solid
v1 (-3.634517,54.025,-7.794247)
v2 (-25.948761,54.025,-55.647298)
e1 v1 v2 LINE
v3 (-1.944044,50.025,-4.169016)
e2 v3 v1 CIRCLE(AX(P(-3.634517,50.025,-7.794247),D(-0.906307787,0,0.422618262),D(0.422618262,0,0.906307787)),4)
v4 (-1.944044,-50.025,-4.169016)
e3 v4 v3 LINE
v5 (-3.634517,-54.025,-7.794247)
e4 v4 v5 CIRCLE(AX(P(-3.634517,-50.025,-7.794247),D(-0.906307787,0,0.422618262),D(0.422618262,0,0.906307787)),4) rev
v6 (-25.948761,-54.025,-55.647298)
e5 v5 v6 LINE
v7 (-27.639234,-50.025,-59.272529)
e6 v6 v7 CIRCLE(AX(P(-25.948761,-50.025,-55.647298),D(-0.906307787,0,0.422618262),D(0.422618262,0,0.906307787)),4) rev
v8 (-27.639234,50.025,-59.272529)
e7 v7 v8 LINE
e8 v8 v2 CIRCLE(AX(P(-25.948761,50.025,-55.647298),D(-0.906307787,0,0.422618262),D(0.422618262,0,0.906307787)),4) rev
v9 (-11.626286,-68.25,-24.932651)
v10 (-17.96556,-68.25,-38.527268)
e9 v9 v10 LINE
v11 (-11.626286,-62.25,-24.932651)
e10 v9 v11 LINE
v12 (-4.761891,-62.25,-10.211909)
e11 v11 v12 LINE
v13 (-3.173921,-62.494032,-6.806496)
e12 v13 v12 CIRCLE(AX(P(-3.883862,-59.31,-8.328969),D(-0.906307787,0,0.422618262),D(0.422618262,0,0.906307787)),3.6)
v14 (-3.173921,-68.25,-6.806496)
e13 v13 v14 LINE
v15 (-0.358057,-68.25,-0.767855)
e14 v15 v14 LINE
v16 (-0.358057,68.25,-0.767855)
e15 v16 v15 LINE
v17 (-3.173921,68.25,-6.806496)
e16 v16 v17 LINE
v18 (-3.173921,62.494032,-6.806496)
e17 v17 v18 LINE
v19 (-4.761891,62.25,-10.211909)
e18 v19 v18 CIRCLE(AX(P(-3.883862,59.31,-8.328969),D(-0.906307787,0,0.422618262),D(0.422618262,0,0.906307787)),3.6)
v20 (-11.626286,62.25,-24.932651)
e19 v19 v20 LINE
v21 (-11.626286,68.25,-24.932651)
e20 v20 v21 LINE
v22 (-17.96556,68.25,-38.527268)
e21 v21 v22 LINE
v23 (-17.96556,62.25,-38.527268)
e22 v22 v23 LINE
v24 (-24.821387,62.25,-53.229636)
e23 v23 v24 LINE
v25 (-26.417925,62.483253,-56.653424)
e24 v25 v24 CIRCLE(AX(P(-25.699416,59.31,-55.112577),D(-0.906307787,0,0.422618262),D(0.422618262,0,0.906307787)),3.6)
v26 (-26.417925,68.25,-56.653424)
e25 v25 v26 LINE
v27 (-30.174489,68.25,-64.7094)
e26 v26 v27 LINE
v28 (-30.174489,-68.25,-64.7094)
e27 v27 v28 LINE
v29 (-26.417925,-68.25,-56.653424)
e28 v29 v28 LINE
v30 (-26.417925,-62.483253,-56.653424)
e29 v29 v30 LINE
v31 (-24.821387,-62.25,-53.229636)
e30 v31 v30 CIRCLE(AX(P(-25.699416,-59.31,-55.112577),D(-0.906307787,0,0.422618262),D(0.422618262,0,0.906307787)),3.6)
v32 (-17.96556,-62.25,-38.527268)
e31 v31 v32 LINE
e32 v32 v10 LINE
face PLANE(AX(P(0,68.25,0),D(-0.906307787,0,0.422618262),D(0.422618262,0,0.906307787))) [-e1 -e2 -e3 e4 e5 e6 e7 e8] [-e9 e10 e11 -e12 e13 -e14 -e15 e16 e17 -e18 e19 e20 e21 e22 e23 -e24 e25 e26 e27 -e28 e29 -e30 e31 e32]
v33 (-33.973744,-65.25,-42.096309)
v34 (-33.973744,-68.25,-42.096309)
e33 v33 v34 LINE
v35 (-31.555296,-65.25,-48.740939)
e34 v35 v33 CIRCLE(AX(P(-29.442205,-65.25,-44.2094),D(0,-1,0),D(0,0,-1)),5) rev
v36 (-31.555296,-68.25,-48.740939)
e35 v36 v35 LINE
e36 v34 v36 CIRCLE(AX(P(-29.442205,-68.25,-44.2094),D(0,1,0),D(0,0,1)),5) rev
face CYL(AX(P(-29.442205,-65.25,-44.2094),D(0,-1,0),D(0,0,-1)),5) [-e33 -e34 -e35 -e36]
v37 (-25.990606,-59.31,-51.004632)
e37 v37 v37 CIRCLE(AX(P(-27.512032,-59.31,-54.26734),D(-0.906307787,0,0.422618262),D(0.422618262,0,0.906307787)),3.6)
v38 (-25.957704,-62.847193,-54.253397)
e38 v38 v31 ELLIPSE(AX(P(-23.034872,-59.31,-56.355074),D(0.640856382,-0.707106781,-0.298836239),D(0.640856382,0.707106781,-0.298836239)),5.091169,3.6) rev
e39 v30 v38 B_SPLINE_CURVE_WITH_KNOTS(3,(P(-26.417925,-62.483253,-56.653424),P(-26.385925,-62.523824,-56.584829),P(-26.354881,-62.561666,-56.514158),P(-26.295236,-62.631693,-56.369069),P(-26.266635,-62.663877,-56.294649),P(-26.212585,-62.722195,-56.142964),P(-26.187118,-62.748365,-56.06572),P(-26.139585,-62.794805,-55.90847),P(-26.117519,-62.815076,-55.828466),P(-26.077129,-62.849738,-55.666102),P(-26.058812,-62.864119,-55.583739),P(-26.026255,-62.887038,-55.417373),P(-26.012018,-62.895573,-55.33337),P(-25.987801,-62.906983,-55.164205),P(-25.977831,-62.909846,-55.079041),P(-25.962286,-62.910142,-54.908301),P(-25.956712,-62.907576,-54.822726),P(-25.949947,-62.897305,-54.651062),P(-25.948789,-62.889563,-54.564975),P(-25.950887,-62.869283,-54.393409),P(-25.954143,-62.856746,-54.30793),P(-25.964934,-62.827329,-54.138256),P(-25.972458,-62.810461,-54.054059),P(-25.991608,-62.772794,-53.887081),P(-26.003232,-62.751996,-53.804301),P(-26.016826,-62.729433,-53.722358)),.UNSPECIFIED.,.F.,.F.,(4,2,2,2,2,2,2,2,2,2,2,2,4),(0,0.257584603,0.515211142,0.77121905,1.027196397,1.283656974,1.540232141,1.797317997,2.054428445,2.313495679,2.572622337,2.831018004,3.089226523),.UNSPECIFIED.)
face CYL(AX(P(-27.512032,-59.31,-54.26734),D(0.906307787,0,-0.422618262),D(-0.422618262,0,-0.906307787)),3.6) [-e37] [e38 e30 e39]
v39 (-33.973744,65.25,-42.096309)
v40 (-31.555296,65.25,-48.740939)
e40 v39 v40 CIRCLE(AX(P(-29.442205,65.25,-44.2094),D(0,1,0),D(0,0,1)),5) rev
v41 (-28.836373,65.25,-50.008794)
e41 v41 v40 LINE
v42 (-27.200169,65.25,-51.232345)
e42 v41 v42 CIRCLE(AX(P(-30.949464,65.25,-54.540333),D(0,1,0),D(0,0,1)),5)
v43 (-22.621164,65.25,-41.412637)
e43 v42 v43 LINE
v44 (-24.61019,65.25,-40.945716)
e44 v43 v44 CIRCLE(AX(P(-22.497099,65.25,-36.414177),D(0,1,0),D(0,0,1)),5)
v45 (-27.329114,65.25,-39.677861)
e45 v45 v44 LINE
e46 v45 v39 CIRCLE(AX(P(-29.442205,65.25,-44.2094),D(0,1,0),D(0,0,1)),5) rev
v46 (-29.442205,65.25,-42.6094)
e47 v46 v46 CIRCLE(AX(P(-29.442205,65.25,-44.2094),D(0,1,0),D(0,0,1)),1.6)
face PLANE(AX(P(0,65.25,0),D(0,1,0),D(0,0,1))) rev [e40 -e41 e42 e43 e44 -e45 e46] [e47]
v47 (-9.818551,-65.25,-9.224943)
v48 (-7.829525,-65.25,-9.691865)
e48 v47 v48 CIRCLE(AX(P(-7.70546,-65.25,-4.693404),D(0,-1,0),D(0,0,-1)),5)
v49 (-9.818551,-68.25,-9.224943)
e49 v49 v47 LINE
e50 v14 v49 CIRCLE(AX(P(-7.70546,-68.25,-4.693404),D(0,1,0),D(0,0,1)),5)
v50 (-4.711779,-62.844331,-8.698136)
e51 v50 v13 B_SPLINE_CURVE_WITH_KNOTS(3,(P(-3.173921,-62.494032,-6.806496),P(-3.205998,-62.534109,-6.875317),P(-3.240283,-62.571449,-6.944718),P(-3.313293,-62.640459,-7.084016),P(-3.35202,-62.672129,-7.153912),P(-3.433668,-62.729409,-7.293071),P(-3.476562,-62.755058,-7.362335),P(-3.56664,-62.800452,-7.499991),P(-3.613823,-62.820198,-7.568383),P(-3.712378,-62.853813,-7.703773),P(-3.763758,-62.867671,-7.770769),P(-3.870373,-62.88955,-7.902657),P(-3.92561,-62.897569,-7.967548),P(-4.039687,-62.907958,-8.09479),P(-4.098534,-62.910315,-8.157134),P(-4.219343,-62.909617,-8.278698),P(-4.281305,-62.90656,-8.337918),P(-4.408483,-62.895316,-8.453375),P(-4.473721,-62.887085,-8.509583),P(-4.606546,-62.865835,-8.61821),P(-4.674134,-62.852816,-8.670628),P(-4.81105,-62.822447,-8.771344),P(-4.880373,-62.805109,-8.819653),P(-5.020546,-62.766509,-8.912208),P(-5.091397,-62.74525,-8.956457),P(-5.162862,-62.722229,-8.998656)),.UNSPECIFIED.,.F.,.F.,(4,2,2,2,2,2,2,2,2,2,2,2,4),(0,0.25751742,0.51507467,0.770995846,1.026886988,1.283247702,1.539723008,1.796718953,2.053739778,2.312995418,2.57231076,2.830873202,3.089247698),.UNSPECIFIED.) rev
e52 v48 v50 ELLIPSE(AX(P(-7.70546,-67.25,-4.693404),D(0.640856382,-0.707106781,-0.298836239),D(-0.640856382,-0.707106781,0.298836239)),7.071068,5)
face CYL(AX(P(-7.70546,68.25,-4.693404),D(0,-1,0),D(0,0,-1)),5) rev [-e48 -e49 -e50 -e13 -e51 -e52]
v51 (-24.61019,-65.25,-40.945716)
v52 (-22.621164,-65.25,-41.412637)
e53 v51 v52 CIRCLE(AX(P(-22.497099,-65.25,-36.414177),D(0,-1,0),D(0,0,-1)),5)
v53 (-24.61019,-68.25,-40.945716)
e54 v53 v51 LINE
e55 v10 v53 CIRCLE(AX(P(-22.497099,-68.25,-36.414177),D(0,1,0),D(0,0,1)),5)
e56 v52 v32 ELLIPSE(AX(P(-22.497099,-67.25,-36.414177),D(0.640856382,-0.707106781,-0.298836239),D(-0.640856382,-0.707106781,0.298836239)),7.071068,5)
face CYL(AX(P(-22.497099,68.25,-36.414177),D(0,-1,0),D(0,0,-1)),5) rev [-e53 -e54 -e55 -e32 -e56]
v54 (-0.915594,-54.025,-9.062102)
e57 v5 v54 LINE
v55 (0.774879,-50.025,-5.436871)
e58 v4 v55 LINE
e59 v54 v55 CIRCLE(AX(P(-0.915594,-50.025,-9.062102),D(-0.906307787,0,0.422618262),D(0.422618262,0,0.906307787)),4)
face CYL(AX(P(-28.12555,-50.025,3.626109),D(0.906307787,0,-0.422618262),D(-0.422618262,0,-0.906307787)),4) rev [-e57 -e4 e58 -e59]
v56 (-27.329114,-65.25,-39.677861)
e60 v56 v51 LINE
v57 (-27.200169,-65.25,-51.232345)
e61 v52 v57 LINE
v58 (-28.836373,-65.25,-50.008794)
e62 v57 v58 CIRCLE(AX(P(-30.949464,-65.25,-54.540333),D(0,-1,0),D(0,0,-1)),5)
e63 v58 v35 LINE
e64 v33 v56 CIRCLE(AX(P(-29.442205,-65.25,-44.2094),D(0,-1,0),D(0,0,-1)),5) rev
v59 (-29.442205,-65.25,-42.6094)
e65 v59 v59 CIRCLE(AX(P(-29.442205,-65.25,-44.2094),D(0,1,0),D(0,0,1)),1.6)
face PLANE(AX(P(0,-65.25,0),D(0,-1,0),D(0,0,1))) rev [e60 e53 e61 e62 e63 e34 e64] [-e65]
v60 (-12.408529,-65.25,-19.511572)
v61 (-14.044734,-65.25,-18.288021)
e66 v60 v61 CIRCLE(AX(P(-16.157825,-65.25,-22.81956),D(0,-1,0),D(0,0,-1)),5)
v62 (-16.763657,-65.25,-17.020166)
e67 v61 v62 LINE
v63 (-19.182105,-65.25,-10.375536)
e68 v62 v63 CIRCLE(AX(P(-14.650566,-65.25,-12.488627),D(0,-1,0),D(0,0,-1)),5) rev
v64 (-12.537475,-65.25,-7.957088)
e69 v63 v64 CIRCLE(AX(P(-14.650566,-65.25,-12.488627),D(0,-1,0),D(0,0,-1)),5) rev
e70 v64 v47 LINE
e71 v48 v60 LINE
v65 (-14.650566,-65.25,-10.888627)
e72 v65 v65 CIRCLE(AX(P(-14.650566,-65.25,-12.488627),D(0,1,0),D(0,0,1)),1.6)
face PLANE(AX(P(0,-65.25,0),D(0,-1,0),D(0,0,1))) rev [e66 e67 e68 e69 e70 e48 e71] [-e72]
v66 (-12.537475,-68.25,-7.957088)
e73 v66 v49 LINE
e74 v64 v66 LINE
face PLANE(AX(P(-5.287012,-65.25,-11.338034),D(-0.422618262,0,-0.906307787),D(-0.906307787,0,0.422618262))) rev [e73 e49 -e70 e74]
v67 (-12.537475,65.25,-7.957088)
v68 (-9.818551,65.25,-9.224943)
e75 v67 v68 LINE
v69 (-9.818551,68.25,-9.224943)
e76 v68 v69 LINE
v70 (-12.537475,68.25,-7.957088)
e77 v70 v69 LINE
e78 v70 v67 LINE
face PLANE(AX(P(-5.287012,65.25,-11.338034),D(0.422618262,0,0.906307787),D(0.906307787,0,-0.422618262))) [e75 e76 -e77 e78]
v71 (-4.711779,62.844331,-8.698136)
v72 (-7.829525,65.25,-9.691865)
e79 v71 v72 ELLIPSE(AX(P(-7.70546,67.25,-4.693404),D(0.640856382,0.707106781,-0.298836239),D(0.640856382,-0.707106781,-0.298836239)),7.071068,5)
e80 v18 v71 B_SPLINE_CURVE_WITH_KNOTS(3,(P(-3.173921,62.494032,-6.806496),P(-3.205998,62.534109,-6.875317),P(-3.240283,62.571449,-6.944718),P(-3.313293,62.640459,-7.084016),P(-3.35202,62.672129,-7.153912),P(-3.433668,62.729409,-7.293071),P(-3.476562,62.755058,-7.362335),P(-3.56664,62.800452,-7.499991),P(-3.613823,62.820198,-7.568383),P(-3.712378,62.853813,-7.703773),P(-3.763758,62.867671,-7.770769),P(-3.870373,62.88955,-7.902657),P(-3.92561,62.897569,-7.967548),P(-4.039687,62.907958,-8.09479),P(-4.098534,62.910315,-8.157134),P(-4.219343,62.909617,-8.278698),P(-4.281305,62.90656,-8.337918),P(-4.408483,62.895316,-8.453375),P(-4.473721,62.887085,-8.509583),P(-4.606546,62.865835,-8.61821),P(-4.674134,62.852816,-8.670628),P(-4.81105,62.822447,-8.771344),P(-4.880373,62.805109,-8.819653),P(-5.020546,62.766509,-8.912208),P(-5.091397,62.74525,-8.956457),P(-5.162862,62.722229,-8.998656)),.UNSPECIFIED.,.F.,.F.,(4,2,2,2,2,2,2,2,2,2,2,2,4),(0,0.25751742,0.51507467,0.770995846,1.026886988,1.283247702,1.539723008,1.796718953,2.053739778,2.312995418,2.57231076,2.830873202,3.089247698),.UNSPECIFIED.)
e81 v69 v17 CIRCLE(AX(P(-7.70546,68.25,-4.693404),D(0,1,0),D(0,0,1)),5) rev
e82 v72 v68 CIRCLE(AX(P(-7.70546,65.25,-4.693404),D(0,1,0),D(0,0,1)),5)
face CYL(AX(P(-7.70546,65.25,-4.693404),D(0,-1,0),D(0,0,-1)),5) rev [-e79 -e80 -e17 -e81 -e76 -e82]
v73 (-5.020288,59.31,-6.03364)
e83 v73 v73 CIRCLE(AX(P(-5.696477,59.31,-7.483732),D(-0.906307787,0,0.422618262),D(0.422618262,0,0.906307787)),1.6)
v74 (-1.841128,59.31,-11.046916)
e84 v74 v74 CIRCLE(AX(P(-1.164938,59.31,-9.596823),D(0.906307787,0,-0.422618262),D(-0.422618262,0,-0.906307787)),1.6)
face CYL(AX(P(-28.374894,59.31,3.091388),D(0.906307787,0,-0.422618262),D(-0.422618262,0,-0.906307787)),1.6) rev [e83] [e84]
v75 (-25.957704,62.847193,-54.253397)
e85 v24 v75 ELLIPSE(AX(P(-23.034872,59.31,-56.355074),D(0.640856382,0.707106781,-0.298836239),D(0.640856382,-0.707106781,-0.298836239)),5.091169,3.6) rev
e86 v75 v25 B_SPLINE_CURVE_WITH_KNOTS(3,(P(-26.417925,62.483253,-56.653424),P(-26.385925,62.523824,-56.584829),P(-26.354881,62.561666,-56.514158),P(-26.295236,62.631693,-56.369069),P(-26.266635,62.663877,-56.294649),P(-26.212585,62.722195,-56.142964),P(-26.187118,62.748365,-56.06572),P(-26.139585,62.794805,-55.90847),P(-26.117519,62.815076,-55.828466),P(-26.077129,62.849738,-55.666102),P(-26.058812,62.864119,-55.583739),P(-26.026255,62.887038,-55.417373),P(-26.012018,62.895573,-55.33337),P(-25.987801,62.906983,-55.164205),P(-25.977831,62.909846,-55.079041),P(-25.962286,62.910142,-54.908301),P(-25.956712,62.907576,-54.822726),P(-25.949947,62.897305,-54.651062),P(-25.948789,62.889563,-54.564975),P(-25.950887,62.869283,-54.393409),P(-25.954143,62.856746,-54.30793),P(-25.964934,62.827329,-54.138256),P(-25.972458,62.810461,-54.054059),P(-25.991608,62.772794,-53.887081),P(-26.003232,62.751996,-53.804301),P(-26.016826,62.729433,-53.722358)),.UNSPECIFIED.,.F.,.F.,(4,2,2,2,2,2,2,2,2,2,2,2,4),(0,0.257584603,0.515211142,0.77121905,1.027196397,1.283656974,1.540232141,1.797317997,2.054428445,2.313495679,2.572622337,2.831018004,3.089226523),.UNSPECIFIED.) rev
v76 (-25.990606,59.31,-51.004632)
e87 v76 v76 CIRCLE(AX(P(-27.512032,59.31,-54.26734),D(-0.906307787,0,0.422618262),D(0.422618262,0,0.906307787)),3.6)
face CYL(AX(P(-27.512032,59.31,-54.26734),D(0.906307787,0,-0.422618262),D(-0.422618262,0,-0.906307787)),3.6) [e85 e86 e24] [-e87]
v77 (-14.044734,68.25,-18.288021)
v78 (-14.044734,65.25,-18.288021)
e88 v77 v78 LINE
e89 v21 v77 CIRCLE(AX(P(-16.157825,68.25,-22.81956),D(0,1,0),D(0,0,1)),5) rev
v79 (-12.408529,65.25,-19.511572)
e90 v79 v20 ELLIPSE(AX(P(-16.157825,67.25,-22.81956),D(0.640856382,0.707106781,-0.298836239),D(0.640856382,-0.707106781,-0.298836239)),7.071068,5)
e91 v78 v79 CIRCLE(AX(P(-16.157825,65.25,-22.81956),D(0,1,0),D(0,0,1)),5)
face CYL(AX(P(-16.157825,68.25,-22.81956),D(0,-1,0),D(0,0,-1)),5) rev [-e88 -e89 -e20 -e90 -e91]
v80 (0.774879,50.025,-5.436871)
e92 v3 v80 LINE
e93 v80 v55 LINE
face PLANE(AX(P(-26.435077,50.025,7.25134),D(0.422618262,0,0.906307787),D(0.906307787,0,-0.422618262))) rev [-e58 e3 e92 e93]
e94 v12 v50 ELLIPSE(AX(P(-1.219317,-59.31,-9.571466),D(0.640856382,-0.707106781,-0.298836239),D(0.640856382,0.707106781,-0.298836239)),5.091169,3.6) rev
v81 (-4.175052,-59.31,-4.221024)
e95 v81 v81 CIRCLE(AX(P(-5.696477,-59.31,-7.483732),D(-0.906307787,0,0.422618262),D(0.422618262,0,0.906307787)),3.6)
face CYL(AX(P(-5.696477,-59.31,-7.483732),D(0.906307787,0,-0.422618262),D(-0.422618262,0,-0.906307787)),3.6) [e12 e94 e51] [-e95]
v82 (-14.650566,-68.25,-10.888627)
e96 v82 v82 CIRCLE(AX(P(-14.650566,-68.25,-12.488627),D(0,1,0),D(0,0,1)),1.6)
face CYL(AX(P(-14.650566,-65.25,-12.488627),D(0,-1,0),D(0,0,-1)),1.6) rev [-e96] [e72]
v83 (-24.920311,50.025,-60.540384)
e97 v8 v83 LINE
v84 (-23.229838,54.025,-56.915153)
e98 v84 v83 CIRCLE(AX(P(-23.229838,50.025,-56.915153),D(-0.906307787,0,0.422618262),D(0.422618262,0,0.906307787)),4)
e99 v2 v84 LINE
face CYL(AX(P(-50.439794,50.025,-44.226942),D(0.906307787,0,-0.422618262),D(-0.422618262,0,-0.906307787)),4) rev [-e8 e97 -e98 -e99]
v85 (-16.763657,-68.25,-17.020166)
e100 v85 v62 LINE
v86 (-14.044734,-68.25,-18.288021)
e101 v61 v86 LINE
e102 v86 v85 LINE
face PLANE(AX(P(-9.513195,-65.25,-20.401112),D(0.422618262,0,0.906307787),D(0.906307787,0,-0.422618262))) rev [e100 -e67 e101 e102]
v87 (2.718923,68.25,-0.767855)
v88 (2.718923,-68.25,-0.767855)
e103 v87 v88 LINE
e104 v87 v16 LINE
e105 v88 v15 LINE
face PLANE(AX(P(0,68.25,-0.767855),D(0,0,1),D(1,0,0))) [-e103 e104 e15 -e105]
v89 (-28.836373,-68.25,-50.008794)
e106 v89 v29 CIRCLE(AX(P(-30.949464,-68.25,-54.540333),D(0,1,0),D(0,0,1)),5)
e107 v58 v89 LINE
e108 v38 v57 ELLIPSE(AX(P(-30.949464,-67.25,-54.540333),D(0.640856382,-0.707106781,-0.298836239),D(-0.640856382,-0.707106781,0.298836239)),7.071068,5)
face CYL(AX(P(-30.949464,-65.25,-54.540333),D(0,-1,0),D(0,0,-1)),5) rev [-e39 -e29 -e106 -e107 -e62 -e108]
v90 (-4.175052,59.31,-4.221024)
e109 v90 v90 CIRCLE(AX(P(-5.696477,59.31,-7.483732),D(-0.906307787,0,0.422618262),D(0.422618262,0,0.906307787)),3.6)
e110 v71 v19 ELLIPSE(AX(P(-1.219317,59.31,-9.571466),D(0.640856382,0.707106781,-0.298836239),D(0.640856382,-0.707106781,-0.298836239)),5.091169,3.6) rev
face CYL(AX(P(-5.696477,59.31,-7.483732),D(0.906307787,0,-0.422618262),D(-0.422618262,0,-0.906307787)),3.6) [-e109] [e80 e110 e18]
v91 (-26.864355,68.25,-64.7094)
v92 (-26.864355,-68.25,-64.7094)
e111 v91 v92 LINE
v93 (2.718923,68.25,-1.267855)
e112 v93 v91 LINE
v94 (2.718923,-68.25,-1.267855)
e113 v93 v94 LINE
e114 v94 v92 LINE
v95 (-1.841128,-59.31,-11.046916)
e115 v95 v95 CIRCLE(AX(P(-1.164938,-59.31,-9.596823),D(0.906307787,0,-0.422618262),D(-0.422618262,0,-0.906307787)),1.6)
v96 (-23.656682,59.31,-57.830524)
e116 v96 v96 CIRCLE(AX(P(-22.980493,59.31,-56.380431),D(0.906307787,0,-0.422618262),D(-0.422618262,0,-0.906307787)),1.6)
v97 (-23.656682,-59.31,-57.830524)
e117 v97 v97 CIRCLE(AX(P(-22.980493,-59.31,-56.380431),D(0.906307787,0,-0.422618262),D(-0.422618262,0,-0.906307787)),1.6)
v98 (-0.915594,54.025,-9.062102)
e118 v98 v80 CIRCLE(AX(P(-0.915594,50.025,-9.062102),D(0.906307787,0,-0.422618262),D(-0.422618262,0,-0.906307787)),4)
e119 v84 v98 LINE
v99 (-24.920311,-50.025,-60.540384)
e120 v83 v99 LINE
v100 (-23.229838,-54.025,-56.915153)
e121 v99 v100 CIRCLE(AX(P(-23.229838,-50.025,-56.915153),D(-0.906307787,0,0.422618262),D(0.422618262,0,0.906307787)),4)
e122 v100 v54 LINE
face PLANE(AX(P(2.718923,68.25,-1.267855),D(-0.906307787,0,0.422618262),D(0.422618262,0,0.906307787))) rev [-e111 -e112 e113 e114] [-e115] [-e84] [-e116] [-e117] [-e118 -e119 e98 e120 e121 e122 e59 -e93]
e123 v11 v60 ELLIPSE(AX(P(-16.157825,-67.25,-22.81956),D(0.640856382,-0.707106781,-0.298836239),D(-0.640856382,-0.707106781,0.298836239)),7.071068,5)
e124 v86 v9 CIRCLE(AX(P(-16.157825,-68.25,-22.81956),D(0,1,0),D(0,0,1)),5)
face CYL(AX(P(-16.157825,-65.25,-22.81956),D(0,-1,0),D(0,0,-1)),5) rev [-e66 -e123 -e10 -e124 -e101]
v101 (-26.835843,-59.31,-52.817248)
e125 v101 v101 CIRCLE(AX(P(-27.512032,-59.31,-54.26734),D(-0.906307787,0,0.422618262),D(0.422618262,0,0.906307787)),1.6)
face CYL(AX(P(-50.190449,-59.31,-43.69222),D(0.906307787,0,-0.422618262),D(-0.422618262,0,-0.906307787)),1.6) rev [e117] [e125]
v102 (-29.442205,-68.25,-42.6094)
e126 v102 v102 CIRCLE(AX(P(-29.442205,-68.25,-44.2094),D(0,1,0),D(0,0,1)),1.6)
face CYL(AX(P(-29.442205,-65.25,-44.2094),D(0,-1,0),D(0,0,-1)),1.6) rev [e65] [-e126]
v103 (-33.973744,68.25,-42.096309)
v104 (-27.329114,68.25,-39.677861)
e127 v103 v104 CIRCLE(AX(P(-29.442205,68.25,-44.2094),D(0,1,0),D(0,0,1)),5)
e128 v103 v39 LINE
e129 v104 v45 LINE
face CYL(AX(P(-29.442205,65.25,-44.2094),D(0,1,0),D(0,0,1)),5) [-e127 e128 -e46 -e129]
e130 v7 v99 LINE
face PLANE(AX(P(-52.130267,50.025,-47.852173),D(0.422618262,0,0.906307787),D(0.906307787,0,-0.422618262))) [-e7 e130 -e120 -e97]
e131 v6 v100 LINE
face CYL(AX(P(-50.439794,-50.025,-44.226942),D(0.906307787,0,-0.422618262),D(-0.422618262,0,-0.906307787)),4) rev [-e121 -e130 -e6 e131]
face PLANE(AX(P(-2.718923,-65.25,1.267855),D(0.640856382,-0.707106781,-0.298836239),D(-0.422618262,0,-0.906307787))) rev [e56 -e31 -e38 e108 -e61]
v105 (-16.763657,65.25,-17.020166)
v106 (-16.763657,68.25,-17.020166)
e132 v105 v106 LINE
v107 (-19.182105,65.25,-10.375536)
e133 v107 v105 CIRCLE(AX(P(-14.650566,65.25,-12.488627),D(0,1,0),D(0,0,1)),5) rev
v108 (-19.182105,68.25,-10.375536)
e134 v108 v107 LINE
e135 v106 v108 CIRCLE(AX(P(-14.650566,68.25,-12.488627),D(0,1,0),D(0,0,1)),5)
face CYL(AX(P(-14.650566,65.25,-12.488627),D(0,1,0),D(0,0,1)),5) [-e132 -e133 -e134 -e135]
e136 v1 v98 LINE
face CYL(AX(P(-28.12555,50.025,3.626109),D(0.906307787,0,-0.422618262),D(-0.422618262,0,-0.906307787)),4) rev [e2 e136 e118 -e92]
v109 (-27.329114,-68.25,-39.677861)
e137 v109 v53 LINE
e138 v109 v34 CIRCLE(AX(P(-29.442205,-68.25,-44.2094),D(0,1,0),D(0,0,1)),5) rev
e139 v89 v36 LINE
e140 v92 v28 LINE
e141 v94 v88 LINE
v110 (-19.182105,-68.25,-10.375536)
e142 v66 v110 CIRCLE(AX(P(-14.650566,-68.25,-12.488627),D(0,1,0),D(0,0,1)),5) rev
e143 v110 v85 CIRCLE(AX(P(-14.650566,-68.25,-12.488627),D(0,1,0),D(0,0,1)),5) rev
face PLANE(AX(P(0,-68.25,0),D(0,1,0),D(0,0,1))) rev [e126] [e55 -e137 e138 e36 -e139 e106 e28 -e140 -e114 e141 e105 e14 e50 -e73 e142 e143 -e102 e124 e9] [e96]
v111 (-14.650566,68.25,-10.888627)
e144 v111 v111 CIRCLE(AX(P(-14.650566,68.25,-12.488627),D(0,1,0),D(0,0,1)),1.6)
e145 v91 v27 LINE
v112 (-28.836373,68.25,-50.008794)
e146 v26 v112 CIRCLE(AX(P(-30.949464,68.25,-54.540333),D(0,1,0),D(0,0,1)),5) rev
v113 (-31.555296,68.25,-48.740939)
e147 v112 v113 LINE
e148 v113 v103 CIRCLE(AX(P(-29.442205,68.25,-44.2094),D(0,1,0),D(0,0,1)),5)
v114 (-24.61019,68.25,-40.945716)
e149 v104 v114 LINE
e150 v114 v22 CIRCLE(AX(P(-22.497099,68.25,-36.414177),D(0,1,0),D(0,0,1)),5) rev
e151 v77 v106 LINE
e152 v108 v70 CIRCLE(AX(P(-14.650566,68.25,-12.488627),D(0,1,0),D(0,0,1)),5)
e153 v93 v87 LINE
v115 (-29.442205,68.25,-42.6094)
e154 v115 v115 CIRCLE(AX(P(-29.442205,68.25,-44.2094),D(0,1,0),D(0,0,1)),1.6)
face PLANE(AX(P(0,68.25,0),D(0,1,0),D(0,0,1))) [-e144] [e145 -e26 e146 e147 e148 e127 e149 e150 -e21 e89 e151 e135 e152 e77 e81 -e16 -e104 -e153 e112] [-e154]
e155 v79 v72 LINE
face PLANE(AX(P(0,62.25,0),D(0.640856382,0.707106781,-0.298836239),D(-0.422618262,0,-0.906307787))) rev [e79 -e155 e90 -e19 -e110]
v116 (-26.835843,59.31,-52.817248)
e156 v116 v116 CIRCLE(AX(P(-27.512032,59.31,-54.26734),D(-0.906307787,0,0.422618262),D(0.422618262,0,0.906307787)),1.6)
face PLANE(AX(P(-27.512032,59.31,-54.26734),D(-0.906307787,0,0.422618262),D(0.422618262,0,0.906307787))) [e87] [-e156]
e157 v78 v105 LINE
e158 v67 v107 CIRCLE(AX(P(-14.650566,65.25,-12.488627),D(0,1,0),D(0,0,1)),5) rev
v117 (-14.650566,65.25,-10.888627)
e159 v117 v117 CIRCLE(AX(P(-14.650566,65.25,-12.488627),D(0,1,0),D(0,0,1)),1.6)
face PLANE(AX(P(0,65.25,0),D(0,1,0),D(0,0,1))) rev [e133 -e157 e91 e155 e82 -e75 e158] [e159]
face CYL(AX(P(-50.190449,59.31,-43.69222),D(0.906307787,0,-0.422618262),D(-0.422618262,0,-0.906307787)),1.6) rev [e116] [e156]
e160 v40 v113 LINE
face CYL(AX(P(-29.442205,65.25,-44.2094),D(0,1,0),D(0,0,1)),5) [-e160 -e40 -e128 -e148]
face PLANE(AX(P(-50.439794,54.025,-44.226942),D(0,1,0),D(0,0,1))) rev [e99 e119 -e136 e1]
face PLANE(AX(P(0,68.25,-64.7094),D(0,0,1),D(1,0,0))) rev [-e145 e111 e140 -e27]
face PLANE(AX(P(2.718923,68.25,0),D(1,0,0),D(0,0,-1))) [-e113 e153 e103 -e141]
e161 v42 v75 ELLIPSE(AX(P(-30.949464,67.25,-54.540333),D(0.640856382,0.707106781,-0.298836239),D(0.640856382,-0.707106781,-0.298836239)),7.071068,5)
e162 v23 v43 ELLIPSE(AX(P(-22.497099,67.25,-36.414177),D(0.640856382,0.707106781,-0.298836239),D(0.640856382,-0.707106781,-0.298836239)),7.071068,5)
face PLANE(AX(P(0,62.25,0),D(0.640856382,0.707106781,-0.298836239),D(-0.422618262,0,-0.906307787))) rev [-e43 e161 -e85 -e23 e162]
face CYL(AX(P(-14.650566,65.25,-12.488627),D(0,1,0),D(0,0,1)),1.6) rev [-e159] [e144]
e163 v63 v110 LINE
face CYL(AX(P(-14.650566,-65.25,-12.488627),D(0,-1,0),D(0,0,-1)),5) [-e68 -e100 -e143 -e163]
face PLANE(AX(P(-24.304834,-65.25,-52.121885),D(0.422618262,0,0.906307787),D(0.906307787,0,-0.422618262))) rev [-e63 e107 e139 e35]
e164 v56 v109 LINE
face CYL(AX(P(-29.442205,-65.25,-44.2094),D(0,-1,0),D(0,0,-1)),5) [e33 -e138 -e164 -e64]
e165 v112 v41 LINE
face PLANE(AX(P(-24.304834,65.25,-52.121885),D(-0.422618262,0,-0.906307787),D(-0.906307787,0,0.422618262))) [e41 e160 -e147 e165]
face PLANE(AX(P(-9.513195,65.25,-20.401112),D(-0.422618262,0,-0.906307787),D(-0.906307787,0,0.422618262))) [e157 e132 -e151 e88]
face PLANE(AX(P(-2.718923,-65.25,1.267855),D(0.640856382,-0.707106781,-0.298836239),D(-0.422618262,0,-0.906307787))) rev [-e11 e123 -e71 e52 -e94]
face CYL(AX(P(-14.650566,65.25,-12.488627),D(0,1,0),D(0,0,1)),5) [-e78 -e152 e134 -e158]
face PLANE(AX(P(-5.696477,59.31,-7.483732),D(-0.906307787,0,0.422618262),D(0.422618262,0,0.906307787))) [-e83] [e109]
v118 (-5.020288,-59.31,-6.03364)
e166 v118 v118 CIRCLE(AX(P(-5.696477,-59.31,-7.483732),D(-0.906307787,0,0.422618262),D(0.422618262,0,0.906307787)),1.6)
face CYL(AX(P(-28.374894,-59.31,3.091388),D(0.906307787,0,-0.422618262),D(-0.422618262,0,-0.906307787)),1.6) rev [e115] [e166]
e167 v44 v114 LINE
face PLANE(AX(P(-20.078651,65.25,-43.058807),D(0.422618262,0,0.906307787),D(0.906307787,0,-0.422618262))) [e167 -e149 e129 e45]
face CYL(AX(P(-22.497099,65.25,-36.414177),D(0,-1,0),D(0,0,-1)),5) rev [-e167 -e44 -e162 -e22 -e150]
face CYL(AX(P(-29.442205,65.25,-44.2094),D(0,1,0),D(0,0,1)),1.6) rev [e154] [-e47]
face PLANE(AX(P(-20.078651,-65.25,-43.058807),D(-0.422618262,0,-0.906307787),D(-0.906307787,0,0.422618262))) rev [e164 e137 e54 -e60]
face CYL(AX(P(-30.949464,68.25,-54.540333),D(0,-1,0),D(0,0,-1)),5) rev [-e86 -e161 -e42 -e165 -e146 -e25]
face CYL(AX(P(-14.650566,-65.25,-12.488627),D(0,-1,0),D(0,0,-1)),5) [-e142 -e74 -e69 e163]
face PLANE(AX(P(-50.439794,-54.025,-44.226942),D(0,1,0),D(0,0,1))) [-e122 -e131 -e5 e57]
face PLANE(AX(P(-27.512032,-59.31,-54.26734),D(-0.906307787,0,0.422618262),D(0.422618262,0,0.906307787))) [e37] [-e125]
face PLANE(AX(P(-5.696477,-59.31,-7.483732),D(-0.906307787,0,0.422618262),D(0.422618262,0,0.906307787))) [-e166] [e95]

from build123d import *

# Parameters (mm, degrees)
BOSS_EXTRU_1_DEPTH      = 68.25
ESQUISSE2_R             = 1.6
ENL_V_MAT_EXTRU_2_DEPTH = 99.817350207
ESQUISSE9_R             = 3.6
ESQUISSE9_R_2           = 1.6
BOSS_EXTRU_2_DEPTH      = 2
ESQUISSE12_R            = 1.6
BOSS_EXTRU_4_DEPTH      = 3
CHANFREIN1_SIZE         = 3
CONG_1_R                = 5


with BuildPart() as part:
    # Esquisse1 → Boss.-Extru.1 (new, symmetric)
    with BuildSketch(Plane(origin=(0, 0, 0), x_dir=(1, 0, 0), z_dir=(0, 1, 0))):
        Polygon((-0.358056567, 0.767854785), (2.718923361, 0.767854785), (2.718923361, 1.267854785), (-26.864354961, 64.709399878), (-30.174488718, 64.709399878), align=None)
    extrude(amount=BOSS_EXTRU_1_DEPTH, both=True)

    # Esquisse2 → Enlèv. mat.-Extru.2 (cut, through all)
    with BuildSketch(Plane(origin=(2.718923361, 0, -1.267854785), x_dir=(-0.42261826174069733, 0, -0.906307787036651), z_dir=(0.9063077870366509, 0, -0.4226182617406973))):
        with Locations((60.81, 59.31)):
            Circle(ESQUISSE2_R)
        with Locations((9.19, 59.31)):
            Circle(ESQUISSE2_R)
        with Locations((60.81, -59.31)):
            Circle(ESQUISSE2_R)
        with Locations((9.19, -59.31)):
            Circle(ESQUISSE2_R)
        with BuildLine():
            Line((61.4, 54.025), (8.6, 54.025))
            ThreePointArc((8.6, 54.025), (5.771572875, 52.853427125), (4.6, 50.025))
            Line((4.6, 50.025), (4.6, -50.025))
            ThreePointArc((4.6, -50.025), (5.771572875, -52.853427125), (8.6, -54.025))
            Line((8.6, -54.025), (61.4, -54.025))
            ThreePointArc((61.4, -54.025), (64.228427125, -52.853427125), (65.4, -50.025))
            Line((65.4, -50.025), (65.4, 50.025))
            ThreePointArc((65.4, 50.025), (64.228427125, 52.853427125), (61.4, 54.025))
        make_face()
    extrude(amount=-ENL_V_MAT_EXTRU_2_DEPTH, mode=Mode.SUBTRACT)

    # Esquisse9 → Boss.-Extru.2 (add)
    # profile 1 of 4: a face of its own
    with BuildSketch(Plane(origin=(0, 0, 0), x_dir=(0.42261826174069717, 0, 0.906307787036651), z_dir=(-0.906307787036651, 0, 0.42261826174069717))):
        with Locations((-60.81, -59.31)):
            Circle(ESQUISSE9_R)
        with Locations(Location((-60.81, -59.31, 0), (0, 0, 180))):
            Circle(ESQUISSE9_R_2, mode=Mode.SUBTRACT)
    # profile 2 of 4: a face of its own
    with BuildSketch(Plane(origin=(0, 0, 0), x_dir=(0.42261826174069717, 0, 0.906307787036651), z_dir=(-0.906307787036651, 0, 0.42261826174069717))):
        with Locations((-9.19, -59.31)):
            Circle(ESQUISSE9_R)
        with Locations(Location((-9.19, -59.31, 0), (0, 0, 180))):
            Circle(ESQUISSE9_R_2, mode=Mode.SUBTRACT)
    # profile 3 of 4: a face of its own
    with BuildSketch(Plane(origin=(0, 0, 0), x_dir=(0.42261826174069717, 0, 0.906307787036651), z_dir=(-0.906307787036651, 0, 0.42261826174069717))):
        with Locations((-60.81, 59.31)):
            Circle(ESQUISSE9_R)
        with Locations(Location((-60.81, 59.31, 0), (0, 0, 180))):
            Circle(ESQUISSE9_R_2, mode=Mode.SUBTRACT)
    # profile 4 of 4: a face of its own
    with BuildSketch(Plane(origin=(0, 0, 0), x_dir=(0.42261826174069717, 0, 0.906307787036651), z_dir=(-0.906307787036651, 0, 0.42261826174069717))):
        with Locations((-9.19, 59.31)):
            Circle(ESQUISSE9_R)
        with Locations(Location((-9.19, 59.31, 0), (0, 0, 180))):
            Circle(ESQUISSE9_R_2, mode=Mode.SUBTRACT)
    extrude(amount=BOSS_EXTRU_2_DEPTH)

    # Esquisse12 → Boss.-Extru.4 (add)
    # profile 1 of 2: a face of its own
    with BuildSketch(Plane(origin=(0, 68.25, 0), x_dir=(1, 0, 0), z_dir=(0, 1, 0))):
        Polygon((-24.30483409, 52.121884907), (-20.078651472, 43.058807037), (-31.860652704, 37.564769634), (-36.086835321, 46.627847504), align=None)
        with Locations(Location((-29.442205077, 44.209399878, 0), (0, 0, 270))):
            Circle(ESQUISSE12_R, mode=Mode.SUBTRACT)
    # profile 2 of 2: a face of its own
    with BuildSketch(Plane(origin=(0, 68.25, 0), x_dir=(1, 0, 0), z_dir=(0, 1, 0))):
        Polygon((-9.513194929, 20.401112361), (-5.287012311, 11.33803449), (-17.069013543, 5.843997088), (-21.29519616, 14.907074958), align=None)
        with Locations(Location((-14.650565916, 12.488627332, 0), (0, 0, 270))):
            Circle(ESQUISSE12_R, mode=Mode.SUBTRACT)
    boss_extru_4 = extrude(amount=-BOSS_EXTRU_4_DEPTH)

    # Symétrie1: Boss.-Extru.4 across plane
    add(boss_extru_4.mirror(Plane.ZX))

    # Chanfrein1
    chanfrein1_edges = [part.edges().sort_by_distance(p)[0] for p in [
        (-22.191742781, 65.25, -47.590345972),
        (-7.40010362, 65.25, -15.869573425),
        (-22.191742781, -65.25, -47.590345972),
        (-7.40010362, -65.25, -15.869573425),
    ]]
    chamfer(chanfrein1_edges, length=CHANFREIN1_SIZE)

    # Congé1
    # the kernel refuses this fillet: 5 mm, written as the material it adds along each edge
    with BuildSketch(Plane(origin=(-5.287012311, -49.75, -11.33803449), x_dir=(0.422618261740698, 0, 0.9063077870366506), z_dir=(0, -1, 0))) as cong_1_piece_1_section:
        with BuildLine():
            CenterArc((CONG_1_R, CONG_1_R), CONG_1_R, 180, 90)
            Line((0, CONG_1_R), (0, 0))
            Line((0, 0), (CONG_1_R, 0))
        make_face()
    cong_1_piece_1 = extrude(amount=18.5, mode=Mode.PRIVATE)
    cong_1_piece_1 = split(cong_1_piece_1, bisect_by=Plane(origin=(-5.847164169, -63.503441979, -9.573387631), z_dir=(0.6408563820557893, -0.7071067811865476, -0.2988362387301183)), keep=Keep.TOP, mode=Mode.PRIVATE)
    add(cong_1_piece_1)
    with BuildSketch(Plane(origin=(-5.287012311, -49.75, -11.33803449), x_dir=(0.422618261740698, 0, 0.9063077870366506), z_dir=(0, -1, 0))) as cong_1_piece_2_section:
        with BuildLine():
            CenterArc((CONG_1_R, CONG_1_R), CONG_1_R, 180, 90)
            Line((0, CONG_1_R), (0, 0))
            Line((0, 0), (CONG_1_R, 0))
        make_face()
    cong_1_piece_2 = extrude(amount=18.5, mode=Mode.PRIVATE)
    cong_1_piece_2 = split(cong_1_piece_2, bisect_by=Plane(origin=(-8.692712143, -65.25, -9.659141323), z_dir=(0, -1, 0)), keep=Keep.TOP, mode=Mode.PRIVATE)
    add(cong_1_piece_2)
    with BuildSketch(Plane(origin=(-9.513194929, -68.25, -20.401112361), x_dir=(-0.42261826174069805, 0, -0.9063077870366507), z_dir=(0, 1, 0))) as cong_1_piece_3_section:
        with BuildLine():
            CenterArc((CONG_1_R, CONG_1_R), CONG_1_R, 180, 90)
            Line((0, CONG_1_R), (0, 0))
            Line((0, 0), (CONG_1_R, 0))
        make_face()
    cong_1_piece_3 = extrude(amount=18.5, mode=Mode.PRIVATE)
    cong_1_piece_3 = split(cong_1_piece_3, bisect_by=Plane(origin=(-12.528126804, -65.051720555, -20.237219019), z_dir=(0.6408563820557893, -0.7071067811865476, -0.2988362387301183)), keep=Keep.TOP, mode=Mode.PRIVATE)
    add(cong_1_piece_3)
    with BuildSketch(Plane(origin=(-9.513194929, -68.25, -20.401112361), x_dir=(-0.42261826174069805, 0, -0.9063077870366507), z_dir=(0, 1, 0))) as cong_1_piece_4_section:
        with BuildLine():
            CenterArc((CONG_1_R, CONG_1_R), CONG_1_R, 180, 90)
            Line((0, CONG_1_R), (0, 0))
            Line((0, 0), (CONG_1_R, 0))
        make_face()
    cong_1_piece_4 = extrude(amount=18.5, mode=Mode.PRIVATE)
    cong_1_piece_4 = split(cong_1_piece_4, bisect_by=Plane(origin=(-12.988443364, -65.25, -18.871366656), z_dir=(0, -1, 0)), keep=Keep.TOP, mode=Mode.PRIVATE)
    add(cong_1_piece_4)
    with BuildSketch(Plane(origin=(-20.078651472, -49.75, -43.058807037), x_dir=(0.4226182617406975, 1.3235243039690182e-15, 0.9063077870366509), z_dir=(0, -1, 0))) as cong_1_piece_5_section:
        with BuildLine():
            CenterArc((CONG_1_R, CONG_1_R), CONG_1_R, 180, 90)
            Line((0, CONG_1_R), (0, 0))
            Line((0, 0), (CONG_1_R, 0))
        make_face()
    cong_1_piece_5 = extrude(amount=18.5, mode=Mode.PRIVATE)
    cong_1_piece_5 = split(cong_1_piece_5, bisect_by=Plane(origin=(-23.484351304, -65.25, -41.379913869), z_dir=(0, -1, 0)), keep=Keep.TOP, mode=Mode.PRIVATE)
    add(cong_1_piece_5)
    with BuildSketch(Plane(origin=(-20.078651472, -49.75, -43.058807037), x_dir=(0.4226182617406975, 1.3235243039690182e-15, 0.9063077870366509), z_dir=(0, -1, 0))) as cong_1_piece_6_section:
        with BuildLine():
            CenterArc((CONG_1_R, CONG_1_R), CONG_1_R, 180, 90)
            Line((0, CONG_1_R), (0, 0))
            Line((0, 0), (CONG_1_R, 0))
        make_face()
    cong_1_piece_6 = extrude(amount=18.5, mode=Mode.PRIVATE)
    cong_1_piece_6 = split(cong_1_piece_6, bisect_by=Plane(origin=(-20.647866522, -63.51880747, -41.277238406), z_dir=(0.6408563820557893, -0.7071067811865477, -0.2988362387301182)), keep=Keep.TOP, mode=Mode.PRIVATE)
    add(cong_1_piece_6)
    with BuildSketch(Plane(origin=(-24.30483409, -68.25, -52.121884907), x_dir=(-0.4226182617406975, -1.3235243039690182e-15, -0.9063077870366509), z_dir=(0, 1, 0))) as cong_1_piece_7_section:
        with BuildLine():
            CenterArc((CONG_1_R, CONG_1_R), CONG_1_R, 180, 90)
            Line((0, CONG_1_R), (0, 0))
            Line((0, 0), (CONG_1_R, 0))
        make_face()
    cong_1_piece_7 = extrude(amount=18.5, mode=Mode.PRIVATE)
    cong_1_piece_7 = split(cong_1_piece_7, bisect_by=Plane(origin=(-27.23858246, -64.883026529, -52.183057049), z_dir=(0.6408563820557893, -0.7071067811865477, -0.2988362387301182)), keep=Keep.TOP, mode=Mode.PRIVATE)
    add(cong_1_piece_7)
    with BuildSketch(Plane(origin=(-24.30483409, -68.25, -52.121884907), x_dir=(-0.4226182617406975, -1.3235243039690182e-15, -0.9063077870366509), z_dir=(0, 1, 0))) as cong_1_piece_8_section:
        with BuildLine():
            CenterArc((CONG_1_R, CONG_1_R), CONG_1_R, 180, 90)
            Line((0, CONG_1_R), (0, 0))
            Line((0, 0), (CONG_1_R, 0))
        make_face()
    cong_1_piece_8 = extrude(amount=18.5, mode=Mode.PRIVATE)
    cong_1_piece_8 = split(cong_1_piece_8, bisect_by=Plane(origin=(-27.780082525, -65.25, -50.592139202), z_dir=(0, -1, 0)), keep=Keep.TOP, mode=Mode.PRIVATE)
    add(cong_1_piece_8)
    with BuildSketch(Plane(origin=(-5.287012311, 68.25, -11.33803449), x_dir=(0.4226182617406971, 0, 0.906307787036651), z_dir=(0, -1, 0))) as cong_1_piece_9_section:
        with BuildLine():
            CenterArc((CONG_1_R, CONG_1_R), CONG_1_R, 180, 90)
            Line((0, CONG_1_R), (0, 0))
            Line((0, 0), (CONG_1_R, 0))
        make_face()
    cong_1_piece_9 = extrude(amount=18.5, mode=Mode.PRIVATE)
    cong_1_piece_9 = split(cong_1_piece_9, bisect_by=Plane(origin=(-7.125928834, 64.883026529, -9.051332159), z_dir=(0.6408563820557893, 0.7071067811865476, -0.2988362387301183)), keep=Keep.TOP, mode=Mode.PRIVATE)
    add(cong_1_piece_9)
    with BuildSketch(Plane(origin=(-5.287012311, 68.25, -11.33803449), x_dir=(0.4226182617406971, 0, 0.906307787036651), z_dir=(0, -1, 0))) as cong_1_piece_10_section:
        with BuildLine():
            CenterArc((CONG_1_R, CONG_1_R), CONG_1_R, 180, 90)
            Line((0, CONG_1_R), (0, 0))
            Line((0, 0), (CONG_1_R, 0))
        make_face()
    cong_1_piece_10 = extrude(amount=18.5, mode=Mode.PRIVATE)
    cong_1_piece_10 = split(cong_1_piece_10, bisect_by=Plane(origin=(-8.692712143, 65.25, -9.659141323), z_dir=(0, 1, 0)), keep=Keep.TOP, mode=Mode.PRIVATE)
    add(cong_1_piece_10)
    with BuildSketch(Plane(origin=(-9.513194929, 49.75, -20.401112361), x_dir=(-0.4226182617406978, 0, -0.9063077870366508), z_dir=(0, 1, 0))) as cong_1_piece_11_section:
        with BuildLine():
            CenterArc((CONG_1_R, CONG_1_R), CONG_1_R, 180, 90)
            Line((0, CONG_1_R), (0, 0))
            Line((0, 0), (CONG_1_R, 0))
        make_face()
    cong_1_piece_11 = extrude(amount=18.5, mode=Mode.PRIVATE)
    cong_1_piece_11 = split(cong_1_piece_11, bisect_by=Plane(origin=(-12.988443364, 65.25, -18.871366656), z_dir=(0, 1, 0)), keep=Keep.TOP, mode=Mode.PRIVATE)
    add(cong_1_piece_11)
    with BuildSketch(Plane(origin=(-9.513194929, 49.75, -20.401112361), x_dir=(-0.4226182617406978, 0, -0.9063077870366508), z_dir=(0, 1, 0))) as cong_1_piece_12_section:
        with BuildLine():
            CenterArc((CONG_1_R, CONG_1_R), CONG_1_R, 180, 90)
            Line((0, CONG_1_R), (0, 0))
            Line((0, 0), (CONG_1_R, 0))
        make_face()
    cong_1_piece_12 = extrude(amount=18.5, mode=Mode.PRIVATE)
    cong_1_piece_12 = split(cong_1_piece_12, bisect_by=Plane(origin=(-11.24384006, 63.51880747, -21.110238576), z_dir=(0.6408563820557893, 0.7071067811865476, -0.2988362387301183)), keep=Keep.TOP, mode=Mode.PRIVATE)
    add(cong_1_piece_12)
    with BuildSketch(Plane(origin=(-24.30483409, 49.75, -52.121884907), x_dir=(-0.4226182617406975, 1.3235243039690182e-15, -0.9063077870366509), z_dir=(0, 1, 0))) as cong_1_piece_13_section:
        with BuildLine():
            CenterArc((CONG_1_R, CONG_1_R), CONG_1_R, 180, 90)
            Line((0, CONG_1_R), (0, 0))
            Line((0, 0), (CONG_1_R, 0))
        make_face()
    cong_1_piece_13 = extrude(amount=18.5, mode=Mode.PRIVATE)
    cong_1_piece_13 = split(cong_1_piece_13, bisect_by=Plane(origin=(-26.016932611, 63.503818008, -52.826705881), z_dir=(0.6408563820557893, 0.7071067811865477, -0.2988362387301182)), keep=Keep.TOP, mode=Mode.PRIVATE)
    add(cong_1_piece_13)
    with BuildSketch(Plane(origin=(-24.30483409, 49.75, -52.121884907), x_dir=(-0.4226182617406975, 1.3235243039690182e-15, -0.9063077870366509), z_dir=(0, 1, 0))) as cong_1_piece_14_section:
        with BuildLine():
            CenterArc((CONG_1_R, CONG_1_R), CONG_1_R, 180, 90)
            Line((0, CONG_1_R), (0, 0))
            Line((0, 0), (CONG_1_R, 0))
        make_face()
    cong_1_piece_14 = extrude(amount=18.5, mode=Mode.PRIVATE)
    cong_1_piece_14 = split(cong_1_piece_14, bisect_by=Plane(origin=(-27.780082525, 65.25, -50.592139202), z_dir=(0, 1, 0)), keep=Keep.TOP, mode=Mode.PRIVATE)
    add(cong_1_piece_14)
    with BuildSketch(Plane(origin=(-20.078651472, 68.25, -43.058807037), x_dir=(0.4226182617406981, -1.323524303969018e-15, 0.9063077870366506), z_dir=(0, -1, 0))) as cong_1_piece_15_section:
        with BuildLine():
            CenterArc((CONG_1_R, CONG_1_R), CONG_1_R, 180, 90)
            Line((0, CONG_1_R), (0, 0))
            Line((0, 0), (CONG_1_R, 0))
        make_face()
    cong_1_piece_15 = extrude(amount=18.5, mode=Mode.PRIVATE)
    cong_1_piece_15 = split(cong_1_piece_15, bisect_by=Plane(origin=(-20.594514955, 65.25, -41.576263464), z_dir=(0, 1, 0)), keep=Keep.TOP, mode=Mode.PRIVATE)
    add(cong_1_piece_15)
    with BuildSketch(Plane(origin=(-20.078651472, 68.25, -43.058807037), x_dir=(0.4226182617406981, -1.323524303969018e-15, 0.9063077870366506), z_dir=(0, -1, 0))) as cong_1_piece_16_section:
        with BuildLine():
            CenterArc((CONG_1_R, CONG_1_R), CONG_1_R, 180, 90)
            Line((0, CONG_1_R), (0, 0))
            Line((0, 0), (CONG_1_R, 0))
        make_face()
    cong_1_piece_16 = extrude(amount=18.5, mode=Mode.PRIVATE)
    cong_1_piece_16 = split(cong_1_piece_16, bisect_by=Plane(origin=(-20.647866522, 63.51880747, -41.277238406), z_dir=(0.6408563820557893, 0.7071067811865477, -0.2988362387301182)), keep=Keep.TOP, mode=Mode.PRIVATE)
    add(cong_1_piece_16)
    # the kernel refuses this fillet: 5 mm, written as the material it takes off along each edge
    with BuildSketch(Plane(origin=(-17.069013543, -80.75, -5.843997088), x_dir=(-0.42261826174069644, 0, -0.9063077870366514), z_dir=(0, 1, 0)), Plane(origin=(-21.29519616, -80.75, -14.907074958), x_dir=(0.9063077870366512, 0, -0.42261826174069694), z_dir=(0, 1, 0)), Plane(origin=(-31.860652704, -80.75, -37.564769634), x_dir=(-0.42261826174069683, 0, -0.9063077870366512), z_dir=(0, 1, 0)), Plane(origin=(-36.086835321, -80.75, -46.627847504), x_dir=(0.906307787036651, 0, -0.42261826174069694), z_dir=(0, 1, 0)), Plane(origin=(-17.069013543, 80.75, -5.843997088), x_dir=(0.9063077870366508, 0, -0.42261826174069783), z_dir=(0, -1, 0)), Plane(origin=(-21.29519616, 80.75, -14.907074958), x_dir=(0.4226182617406976, 0, 0.9063077870366508), z_dir=(0, -1, 0)), Plane(origin=(-31.860652704, 80.75, -37.564769634), x_dir=(0.9063077870366512, 0, -0.42261826174069683), z_dir=(0, -1, 0)), Plane(origin=(-36.086835321, 80.75, -46.627847504), x_dir=(0.42261826174069805, 0, 0.9063077870366507), z_dir=(0, -1, 0))) as cong_1_2_piece_1:
        with BuildLine():
            CenterArc((CONG_1_R, -CONG_1_R), CONG_1_R, 90, 90)
            Line((0, -CONG_1_R), (0, 0))
            Line((0, 0), (CONG_1_R, 0))
        make_face()
    extrude(amount=28, mode=Mode.SUBTRACT)


solid = part.part
